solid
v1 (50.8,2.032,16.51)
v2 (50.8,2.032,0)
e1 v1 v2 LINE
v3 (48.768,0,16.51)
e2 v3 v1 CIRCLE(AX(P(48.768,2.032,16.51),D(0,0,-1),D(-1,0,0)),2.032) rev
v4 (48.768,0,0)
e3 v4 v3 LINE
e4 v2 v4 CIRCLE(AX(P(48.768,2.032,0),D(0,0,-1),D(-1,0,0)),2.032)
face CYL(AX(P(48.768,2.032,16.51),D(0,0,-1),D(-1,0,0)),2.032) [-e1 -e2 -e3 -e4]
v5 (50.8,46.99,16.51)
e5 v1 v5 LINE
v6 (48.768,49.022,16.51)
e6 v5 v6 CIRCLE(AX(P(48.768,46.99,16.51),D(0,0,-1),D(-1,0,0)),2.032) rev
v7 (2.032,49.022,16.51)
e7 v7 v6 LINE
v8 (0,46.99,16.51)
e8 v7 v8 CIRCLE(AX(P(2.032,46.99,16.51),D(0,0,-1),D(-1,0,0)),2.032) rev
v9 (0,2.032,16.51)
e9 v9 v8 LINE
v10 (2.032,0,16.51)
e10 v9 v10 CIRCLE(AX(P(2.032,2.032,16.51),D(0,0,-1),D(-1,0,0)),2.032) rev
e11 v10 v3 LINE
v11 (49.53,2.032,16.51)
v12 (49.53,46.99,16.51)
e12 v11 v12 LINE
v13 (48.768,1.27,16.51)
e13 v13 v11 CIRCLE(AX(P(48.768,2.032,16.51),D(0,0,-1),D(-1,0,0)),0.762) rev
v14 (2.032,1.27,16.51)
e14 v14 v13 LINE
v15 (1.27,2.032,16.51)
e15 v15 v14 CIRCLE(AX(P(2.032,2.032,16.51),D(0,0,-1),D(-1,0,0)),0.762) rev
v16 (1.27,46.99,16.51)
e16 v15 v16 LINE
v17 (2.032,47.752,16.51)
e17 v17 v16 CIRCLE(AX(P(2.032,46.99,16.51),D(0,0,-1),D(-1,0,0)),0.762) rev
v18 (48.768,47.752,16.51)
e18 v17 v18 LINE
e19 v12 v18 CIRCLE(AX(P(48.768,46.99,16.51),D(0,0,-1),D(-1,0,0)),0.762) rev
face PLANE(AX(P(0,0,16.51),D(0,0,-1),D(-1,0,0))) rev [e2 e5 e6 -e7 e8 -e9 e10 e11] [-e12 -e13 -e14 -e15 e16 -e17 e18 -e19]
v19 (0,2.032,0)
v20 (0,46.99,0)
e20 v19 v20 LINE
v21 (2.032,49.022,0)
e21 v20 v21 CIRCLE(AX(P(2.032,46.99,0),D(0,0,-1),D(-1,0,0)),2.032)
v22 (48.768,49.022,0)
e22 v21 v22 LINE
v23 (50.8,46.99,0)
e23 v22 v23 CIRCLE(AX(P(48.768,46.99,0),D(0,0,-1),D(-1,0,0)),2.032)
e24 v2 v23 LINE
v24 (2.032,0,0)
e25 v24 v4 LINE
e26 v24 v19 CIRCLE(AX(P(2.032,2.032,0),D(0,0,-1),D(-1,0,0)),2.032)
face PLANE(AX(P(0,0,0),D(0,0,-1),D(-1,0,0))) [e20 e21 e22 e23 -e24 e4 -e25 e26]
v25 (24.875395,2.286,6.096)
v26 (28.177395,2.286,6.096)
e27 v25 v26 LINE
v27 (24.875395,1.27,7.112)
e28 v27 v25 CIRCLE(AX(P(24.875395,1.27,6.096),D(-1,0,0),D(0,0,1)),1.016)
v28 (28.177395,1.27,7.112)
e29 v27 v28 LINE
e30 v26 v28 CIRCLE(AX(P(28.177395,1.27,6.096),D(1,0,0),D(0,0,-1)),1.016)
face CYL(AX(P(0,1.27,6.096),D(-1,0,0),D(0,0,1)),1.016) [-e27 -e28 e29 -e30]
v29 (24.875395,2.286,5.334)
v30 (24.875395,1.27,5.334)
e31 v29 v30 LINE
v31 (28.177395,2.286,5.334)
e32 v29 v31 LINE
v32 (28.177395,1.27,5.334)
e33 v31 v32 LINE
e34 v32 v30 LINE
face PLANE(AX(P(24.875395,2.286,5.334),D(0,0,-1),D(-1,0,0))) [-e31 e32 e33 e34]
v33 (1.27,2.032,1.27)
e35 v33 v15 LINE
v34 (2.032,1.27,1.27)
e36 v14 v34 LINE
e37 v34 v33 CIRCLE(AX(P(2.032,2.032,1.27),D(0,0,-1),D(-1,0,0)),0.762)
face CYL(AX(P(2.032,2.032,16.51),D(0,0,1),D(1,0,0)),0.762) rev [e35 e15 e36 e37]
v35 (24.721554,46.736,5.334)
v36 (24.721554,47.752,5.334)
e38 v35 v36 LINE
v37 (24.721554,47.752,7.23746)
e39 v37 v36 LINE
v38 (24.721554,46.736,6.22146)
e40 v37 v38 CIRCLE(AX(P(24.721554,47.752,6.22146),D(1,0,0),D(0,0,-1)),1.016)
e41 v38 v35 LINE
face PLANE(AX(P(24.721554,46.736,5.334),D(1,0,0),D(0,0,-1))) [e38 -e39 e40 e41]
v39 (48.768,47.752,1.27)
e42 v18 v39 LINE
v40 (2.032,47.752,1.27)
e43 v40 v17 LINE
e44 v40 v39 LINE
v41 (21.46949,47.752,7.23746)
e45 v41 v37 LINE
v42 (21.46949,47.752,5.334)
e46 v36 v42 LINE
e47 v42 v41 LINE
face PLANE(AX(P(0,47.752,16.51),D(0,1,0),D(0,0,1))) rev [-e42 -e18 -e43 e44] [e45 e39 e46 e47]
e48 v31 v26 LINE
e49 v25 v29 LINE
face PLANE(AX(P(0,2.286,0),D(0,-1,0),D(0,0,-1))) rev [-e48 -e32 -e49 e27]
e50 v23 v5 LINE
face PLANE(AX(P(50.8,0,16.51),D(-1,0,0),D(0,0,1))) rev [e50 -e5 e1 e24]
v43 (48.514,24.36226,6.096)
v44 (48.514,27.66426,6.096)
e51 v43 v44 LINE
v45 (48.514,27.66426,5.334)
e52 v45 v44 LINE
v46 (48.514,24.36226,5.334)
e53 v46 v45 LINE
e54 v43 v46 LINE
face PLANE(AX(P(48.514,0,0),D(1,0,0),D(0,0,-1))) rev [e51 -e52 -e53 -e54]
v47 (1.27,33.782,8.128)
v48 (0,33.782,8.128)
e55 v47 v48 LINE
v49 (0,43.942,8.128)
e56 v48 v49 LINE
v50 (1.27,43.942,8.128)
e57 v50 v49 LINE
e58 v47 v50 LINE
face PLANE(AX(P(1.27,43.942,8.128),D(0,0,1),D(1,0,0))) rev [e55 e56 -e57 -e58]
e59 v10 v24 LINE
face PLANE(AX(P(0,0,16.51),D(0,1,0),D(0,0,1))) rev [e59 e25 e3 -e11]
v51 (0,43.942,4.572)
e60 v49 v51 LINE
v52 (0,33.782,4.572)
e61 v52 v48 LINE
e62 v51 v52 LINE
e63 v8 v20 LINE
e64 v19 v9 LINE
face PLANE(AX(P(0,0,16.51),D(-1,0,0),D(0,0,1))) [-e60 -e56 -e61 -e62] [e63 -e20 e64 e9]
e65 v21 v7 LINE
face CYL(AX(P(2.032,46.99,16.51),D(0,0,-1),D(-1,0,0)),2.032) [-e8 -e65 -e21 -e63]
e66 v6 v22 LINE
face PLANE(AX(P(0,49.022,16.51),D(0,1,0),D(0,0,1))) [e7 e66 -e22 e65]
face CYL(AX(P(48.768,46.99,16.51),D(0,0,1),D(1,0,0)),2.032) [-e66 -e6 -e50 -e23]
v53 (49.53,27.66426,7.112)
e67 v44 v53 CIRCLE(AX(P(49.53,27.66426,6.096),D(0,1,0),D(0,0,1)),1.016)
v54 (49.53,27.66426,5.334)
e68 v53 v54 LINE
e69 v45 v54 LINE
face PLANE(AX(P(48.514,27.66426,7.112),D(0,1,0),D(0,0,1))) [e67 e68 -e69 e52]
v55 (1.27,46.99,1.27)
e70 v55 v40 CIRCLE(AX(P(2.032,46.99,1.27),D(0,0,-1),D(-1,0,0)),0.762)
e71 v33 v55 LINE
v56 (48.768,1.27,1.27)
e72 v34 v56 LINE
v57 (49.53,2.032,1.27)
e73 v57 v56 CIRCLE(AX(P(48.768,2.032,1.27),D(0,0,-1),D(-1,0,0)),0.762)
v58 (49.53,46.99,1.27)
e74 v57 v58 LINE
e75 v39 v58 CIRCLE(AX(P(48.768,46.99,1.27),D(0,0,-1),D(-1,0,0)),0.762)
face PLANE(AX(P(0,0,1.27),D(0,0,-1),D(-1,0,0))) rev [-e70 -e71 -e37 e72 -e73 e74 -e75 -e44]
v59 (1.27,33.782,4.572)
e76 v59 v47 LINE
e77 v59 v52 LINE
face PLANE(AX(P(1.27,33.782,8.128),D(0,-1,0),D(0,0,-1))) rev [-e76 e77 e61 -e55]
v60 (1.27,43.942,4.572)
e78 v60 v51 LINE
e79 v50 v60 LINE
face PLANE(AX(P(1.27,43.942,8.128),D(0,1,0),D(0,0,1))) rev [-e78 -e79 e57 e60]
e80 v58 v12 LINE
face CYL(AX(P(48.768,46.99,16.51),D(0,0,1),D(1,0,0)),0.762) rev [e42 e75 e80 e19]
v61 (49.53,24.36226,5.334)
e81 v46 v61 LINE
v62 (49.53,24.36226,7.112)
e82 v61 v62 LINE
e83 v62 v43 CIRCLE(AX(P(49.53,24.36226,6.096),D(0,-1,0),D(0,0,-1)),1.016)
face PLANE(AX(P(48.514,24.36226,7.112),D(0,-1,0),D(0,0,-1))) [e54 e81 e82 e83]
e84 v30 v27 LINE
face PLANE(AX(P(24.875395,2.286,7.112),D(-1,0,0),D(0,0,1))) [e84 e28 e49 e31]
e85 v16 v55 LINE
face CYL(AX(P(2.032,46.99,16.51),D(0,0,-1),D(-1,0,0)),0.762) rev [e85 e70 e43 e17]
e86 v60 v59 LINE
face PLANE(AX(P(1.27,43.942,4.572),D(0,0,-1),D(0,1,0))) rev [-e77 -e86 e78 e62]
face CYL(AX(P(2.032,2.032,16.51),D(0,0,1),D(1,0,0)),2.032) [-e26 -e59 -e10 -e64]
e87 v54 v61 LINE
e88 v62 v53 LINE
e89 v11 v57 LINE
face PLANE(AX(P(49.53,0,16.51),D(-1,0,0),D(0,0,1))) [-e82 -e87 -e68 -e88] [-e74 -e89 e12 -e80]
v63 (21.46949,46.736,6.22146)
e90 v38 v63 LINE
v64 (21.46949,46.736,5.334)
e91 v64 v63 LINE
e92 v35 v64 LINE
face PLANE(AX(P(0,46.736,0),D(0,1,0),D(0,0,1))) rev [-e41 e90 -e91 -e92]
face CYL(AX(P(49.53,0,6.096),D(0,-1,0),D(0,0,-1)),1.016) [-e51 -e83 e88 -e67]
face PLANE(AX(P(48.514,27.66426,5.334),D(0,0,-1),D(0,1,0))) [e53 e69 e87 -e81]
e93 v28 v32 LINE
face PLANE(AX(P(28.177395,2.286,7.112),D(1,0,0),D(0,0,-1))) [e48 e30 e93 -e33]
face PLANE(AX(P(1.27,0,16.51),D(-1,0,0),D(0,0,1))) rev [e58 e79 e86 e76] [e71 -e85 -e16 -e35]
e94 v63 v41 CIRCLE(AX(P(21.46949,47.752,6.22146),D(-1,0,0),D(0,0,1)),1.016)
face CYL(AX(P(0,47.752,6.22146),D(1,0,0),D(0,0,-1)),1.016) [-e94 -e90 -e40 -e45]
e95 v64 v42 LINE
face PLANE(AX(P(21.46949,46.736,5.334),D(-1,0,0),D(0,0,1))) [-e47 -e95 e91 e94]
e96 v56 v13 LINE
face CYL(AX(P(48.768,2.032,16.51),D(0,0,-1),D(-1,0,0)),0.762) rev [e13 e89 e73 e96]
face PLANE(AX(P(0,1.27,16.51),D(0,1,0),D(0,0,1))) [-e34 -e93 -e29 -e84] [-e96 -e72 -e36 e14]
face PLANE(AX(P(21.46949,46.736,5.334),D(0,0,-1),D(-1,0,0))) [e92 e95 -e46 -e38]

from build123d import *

# Parameters (mm, degrees)
SKETCH1_W           = 50.8
SKETCH1_H           = 49.022
BOSS_EXTRUDE2_DEPTH = 16.51
FILLET1_R           = 2.032
SHELL2_T            = -1.27
SKETCH4_W           = 3.556
SKETCH4_H           = 10.16
CUT_EXTRUDE2_DEPTH  = 1.27
SKETCH7_W           = 3.2520636
SKETCH7_H           = 1.903459875
BOSS_EXTRUDE5_DEPTH = 2.286
FILLET6_R           = 1.016
SKETCH8_W           = 1.778
SKETCH8_H           = 3.302
BOSS_EXTRUDE6_DEPTH = 2.286
FILLET7_R           = 1.016
SKETCH9_W           = 3.302
SKETCH9_H           = 1.778
BOSS_EXTRUDE7_DEPTH = 2.286
FILLET8_R           = 1.016


with BuildPart() as part:
    # Sketch1 → Boss-Extrude2 (new body)
    with BuildSketch(Plane.XY):
        with Locations((25.4, 24.511)):
            Rectangle(SKETCH1_W, SKETCH1_H)
    extrude(amount=BOSS_EXTRUDE2_DEPTH)

    # Fillet1
    fillet1_edges = [part.edges().sort_by_distance(p)[0] for p in [
        (0, 0, 8.255),
        (50.8, 0, 8.255),
        (50.8, 49.022, 8.255),
        (0, 49.022, 8.255),
    ]]
    fillet(fillet1_edges, radius=FILLET1_R)

    # Shell2
    shell2_openings = [part.faces().sort_by_distance(p)[0] for p in [
        (25.4, 24.511, 16.51),
    ]]
    offset(amount=SHELL2_T, openings=shell2_openings, kind=Kind.INTERSECTION)

    # Sketch4 → Cut-Extrude2 (cut)
    with BuildSketch(Plane.ZY):
        with Locations((6.35, 38.862)):
            Rectangle(SKETCH4_W, SKETCH4_H)
    extrude(amount=-CUT_EXTRUDE2_DEPTH, mode=Mode.SUBTRACT)

    # Sketch7 → Boss-Extrude5 (add)
    with BuildSketch(Plane(origin=(0, 49.022, 0), x_dir=(1, 0, 0), z_dir=(0, 1, 0))):
        with Locations((23.095521807, -6.285729938)):
            Rectangle(SKETCH7_W, SKETCH7_H)
    extrude(amount=-BOSS_EXTRUDE5_DEPTH)

    # Fillet6
    fillet6_edges = [part.edges().sort_by_distance(p)[0] for p in [
        (23.095521807, 46.736, 7.237459875),
    ]]
    fillet(fillet6_edges, radius=FILLET6_R - 0.0001)  # a hair under: the kernel refuses the full size

    # Sketch8 → Boss-Extrude6 (add)
    with BuildSketch(Plane(origin=(50.8, 0, 0), x_dir=(0, 0, -1), z_dir=(1, 0, 0))):
        with Locations((-6.223, 26.013260114)):
            Rectangle(SKETCH8_W, SKETCH8_H)
    extrude(amount=-BOSS_EXTRUDE6_DEPTH)

    # Fillet7
    fillet7_edges = [part.edges().sort_by_distance(p)[0] for p in [
        (48.514, 26.013260114, 7.112),
    ]]
    fillet(fillet7_edges, radius=FILLET7_R - 0.0001)  # a hair under: the kernel refuses the full size

    # Sketch9 → Boss-Extrude7 (add)
    with BuildSketch(Plane.XZ):
        with Locations((26.526394694, 6.223)):
            Rectangle(SKETCH9_W, SKETCH9_H)
    extrude(amount=-BOSS_EXTRUDE7_DEPTH)

    # Fillet8
    fillet8_edges = [part.edges().sort_by_distance(p)[0] for p in [
        (26.526394694, 2.286, 7.112),
    ]]
    fillet(fillet8_edges, radius=FILLET8_R - 0.0001)  # a hair under: the kernel refuses the full size


solid = part.part
